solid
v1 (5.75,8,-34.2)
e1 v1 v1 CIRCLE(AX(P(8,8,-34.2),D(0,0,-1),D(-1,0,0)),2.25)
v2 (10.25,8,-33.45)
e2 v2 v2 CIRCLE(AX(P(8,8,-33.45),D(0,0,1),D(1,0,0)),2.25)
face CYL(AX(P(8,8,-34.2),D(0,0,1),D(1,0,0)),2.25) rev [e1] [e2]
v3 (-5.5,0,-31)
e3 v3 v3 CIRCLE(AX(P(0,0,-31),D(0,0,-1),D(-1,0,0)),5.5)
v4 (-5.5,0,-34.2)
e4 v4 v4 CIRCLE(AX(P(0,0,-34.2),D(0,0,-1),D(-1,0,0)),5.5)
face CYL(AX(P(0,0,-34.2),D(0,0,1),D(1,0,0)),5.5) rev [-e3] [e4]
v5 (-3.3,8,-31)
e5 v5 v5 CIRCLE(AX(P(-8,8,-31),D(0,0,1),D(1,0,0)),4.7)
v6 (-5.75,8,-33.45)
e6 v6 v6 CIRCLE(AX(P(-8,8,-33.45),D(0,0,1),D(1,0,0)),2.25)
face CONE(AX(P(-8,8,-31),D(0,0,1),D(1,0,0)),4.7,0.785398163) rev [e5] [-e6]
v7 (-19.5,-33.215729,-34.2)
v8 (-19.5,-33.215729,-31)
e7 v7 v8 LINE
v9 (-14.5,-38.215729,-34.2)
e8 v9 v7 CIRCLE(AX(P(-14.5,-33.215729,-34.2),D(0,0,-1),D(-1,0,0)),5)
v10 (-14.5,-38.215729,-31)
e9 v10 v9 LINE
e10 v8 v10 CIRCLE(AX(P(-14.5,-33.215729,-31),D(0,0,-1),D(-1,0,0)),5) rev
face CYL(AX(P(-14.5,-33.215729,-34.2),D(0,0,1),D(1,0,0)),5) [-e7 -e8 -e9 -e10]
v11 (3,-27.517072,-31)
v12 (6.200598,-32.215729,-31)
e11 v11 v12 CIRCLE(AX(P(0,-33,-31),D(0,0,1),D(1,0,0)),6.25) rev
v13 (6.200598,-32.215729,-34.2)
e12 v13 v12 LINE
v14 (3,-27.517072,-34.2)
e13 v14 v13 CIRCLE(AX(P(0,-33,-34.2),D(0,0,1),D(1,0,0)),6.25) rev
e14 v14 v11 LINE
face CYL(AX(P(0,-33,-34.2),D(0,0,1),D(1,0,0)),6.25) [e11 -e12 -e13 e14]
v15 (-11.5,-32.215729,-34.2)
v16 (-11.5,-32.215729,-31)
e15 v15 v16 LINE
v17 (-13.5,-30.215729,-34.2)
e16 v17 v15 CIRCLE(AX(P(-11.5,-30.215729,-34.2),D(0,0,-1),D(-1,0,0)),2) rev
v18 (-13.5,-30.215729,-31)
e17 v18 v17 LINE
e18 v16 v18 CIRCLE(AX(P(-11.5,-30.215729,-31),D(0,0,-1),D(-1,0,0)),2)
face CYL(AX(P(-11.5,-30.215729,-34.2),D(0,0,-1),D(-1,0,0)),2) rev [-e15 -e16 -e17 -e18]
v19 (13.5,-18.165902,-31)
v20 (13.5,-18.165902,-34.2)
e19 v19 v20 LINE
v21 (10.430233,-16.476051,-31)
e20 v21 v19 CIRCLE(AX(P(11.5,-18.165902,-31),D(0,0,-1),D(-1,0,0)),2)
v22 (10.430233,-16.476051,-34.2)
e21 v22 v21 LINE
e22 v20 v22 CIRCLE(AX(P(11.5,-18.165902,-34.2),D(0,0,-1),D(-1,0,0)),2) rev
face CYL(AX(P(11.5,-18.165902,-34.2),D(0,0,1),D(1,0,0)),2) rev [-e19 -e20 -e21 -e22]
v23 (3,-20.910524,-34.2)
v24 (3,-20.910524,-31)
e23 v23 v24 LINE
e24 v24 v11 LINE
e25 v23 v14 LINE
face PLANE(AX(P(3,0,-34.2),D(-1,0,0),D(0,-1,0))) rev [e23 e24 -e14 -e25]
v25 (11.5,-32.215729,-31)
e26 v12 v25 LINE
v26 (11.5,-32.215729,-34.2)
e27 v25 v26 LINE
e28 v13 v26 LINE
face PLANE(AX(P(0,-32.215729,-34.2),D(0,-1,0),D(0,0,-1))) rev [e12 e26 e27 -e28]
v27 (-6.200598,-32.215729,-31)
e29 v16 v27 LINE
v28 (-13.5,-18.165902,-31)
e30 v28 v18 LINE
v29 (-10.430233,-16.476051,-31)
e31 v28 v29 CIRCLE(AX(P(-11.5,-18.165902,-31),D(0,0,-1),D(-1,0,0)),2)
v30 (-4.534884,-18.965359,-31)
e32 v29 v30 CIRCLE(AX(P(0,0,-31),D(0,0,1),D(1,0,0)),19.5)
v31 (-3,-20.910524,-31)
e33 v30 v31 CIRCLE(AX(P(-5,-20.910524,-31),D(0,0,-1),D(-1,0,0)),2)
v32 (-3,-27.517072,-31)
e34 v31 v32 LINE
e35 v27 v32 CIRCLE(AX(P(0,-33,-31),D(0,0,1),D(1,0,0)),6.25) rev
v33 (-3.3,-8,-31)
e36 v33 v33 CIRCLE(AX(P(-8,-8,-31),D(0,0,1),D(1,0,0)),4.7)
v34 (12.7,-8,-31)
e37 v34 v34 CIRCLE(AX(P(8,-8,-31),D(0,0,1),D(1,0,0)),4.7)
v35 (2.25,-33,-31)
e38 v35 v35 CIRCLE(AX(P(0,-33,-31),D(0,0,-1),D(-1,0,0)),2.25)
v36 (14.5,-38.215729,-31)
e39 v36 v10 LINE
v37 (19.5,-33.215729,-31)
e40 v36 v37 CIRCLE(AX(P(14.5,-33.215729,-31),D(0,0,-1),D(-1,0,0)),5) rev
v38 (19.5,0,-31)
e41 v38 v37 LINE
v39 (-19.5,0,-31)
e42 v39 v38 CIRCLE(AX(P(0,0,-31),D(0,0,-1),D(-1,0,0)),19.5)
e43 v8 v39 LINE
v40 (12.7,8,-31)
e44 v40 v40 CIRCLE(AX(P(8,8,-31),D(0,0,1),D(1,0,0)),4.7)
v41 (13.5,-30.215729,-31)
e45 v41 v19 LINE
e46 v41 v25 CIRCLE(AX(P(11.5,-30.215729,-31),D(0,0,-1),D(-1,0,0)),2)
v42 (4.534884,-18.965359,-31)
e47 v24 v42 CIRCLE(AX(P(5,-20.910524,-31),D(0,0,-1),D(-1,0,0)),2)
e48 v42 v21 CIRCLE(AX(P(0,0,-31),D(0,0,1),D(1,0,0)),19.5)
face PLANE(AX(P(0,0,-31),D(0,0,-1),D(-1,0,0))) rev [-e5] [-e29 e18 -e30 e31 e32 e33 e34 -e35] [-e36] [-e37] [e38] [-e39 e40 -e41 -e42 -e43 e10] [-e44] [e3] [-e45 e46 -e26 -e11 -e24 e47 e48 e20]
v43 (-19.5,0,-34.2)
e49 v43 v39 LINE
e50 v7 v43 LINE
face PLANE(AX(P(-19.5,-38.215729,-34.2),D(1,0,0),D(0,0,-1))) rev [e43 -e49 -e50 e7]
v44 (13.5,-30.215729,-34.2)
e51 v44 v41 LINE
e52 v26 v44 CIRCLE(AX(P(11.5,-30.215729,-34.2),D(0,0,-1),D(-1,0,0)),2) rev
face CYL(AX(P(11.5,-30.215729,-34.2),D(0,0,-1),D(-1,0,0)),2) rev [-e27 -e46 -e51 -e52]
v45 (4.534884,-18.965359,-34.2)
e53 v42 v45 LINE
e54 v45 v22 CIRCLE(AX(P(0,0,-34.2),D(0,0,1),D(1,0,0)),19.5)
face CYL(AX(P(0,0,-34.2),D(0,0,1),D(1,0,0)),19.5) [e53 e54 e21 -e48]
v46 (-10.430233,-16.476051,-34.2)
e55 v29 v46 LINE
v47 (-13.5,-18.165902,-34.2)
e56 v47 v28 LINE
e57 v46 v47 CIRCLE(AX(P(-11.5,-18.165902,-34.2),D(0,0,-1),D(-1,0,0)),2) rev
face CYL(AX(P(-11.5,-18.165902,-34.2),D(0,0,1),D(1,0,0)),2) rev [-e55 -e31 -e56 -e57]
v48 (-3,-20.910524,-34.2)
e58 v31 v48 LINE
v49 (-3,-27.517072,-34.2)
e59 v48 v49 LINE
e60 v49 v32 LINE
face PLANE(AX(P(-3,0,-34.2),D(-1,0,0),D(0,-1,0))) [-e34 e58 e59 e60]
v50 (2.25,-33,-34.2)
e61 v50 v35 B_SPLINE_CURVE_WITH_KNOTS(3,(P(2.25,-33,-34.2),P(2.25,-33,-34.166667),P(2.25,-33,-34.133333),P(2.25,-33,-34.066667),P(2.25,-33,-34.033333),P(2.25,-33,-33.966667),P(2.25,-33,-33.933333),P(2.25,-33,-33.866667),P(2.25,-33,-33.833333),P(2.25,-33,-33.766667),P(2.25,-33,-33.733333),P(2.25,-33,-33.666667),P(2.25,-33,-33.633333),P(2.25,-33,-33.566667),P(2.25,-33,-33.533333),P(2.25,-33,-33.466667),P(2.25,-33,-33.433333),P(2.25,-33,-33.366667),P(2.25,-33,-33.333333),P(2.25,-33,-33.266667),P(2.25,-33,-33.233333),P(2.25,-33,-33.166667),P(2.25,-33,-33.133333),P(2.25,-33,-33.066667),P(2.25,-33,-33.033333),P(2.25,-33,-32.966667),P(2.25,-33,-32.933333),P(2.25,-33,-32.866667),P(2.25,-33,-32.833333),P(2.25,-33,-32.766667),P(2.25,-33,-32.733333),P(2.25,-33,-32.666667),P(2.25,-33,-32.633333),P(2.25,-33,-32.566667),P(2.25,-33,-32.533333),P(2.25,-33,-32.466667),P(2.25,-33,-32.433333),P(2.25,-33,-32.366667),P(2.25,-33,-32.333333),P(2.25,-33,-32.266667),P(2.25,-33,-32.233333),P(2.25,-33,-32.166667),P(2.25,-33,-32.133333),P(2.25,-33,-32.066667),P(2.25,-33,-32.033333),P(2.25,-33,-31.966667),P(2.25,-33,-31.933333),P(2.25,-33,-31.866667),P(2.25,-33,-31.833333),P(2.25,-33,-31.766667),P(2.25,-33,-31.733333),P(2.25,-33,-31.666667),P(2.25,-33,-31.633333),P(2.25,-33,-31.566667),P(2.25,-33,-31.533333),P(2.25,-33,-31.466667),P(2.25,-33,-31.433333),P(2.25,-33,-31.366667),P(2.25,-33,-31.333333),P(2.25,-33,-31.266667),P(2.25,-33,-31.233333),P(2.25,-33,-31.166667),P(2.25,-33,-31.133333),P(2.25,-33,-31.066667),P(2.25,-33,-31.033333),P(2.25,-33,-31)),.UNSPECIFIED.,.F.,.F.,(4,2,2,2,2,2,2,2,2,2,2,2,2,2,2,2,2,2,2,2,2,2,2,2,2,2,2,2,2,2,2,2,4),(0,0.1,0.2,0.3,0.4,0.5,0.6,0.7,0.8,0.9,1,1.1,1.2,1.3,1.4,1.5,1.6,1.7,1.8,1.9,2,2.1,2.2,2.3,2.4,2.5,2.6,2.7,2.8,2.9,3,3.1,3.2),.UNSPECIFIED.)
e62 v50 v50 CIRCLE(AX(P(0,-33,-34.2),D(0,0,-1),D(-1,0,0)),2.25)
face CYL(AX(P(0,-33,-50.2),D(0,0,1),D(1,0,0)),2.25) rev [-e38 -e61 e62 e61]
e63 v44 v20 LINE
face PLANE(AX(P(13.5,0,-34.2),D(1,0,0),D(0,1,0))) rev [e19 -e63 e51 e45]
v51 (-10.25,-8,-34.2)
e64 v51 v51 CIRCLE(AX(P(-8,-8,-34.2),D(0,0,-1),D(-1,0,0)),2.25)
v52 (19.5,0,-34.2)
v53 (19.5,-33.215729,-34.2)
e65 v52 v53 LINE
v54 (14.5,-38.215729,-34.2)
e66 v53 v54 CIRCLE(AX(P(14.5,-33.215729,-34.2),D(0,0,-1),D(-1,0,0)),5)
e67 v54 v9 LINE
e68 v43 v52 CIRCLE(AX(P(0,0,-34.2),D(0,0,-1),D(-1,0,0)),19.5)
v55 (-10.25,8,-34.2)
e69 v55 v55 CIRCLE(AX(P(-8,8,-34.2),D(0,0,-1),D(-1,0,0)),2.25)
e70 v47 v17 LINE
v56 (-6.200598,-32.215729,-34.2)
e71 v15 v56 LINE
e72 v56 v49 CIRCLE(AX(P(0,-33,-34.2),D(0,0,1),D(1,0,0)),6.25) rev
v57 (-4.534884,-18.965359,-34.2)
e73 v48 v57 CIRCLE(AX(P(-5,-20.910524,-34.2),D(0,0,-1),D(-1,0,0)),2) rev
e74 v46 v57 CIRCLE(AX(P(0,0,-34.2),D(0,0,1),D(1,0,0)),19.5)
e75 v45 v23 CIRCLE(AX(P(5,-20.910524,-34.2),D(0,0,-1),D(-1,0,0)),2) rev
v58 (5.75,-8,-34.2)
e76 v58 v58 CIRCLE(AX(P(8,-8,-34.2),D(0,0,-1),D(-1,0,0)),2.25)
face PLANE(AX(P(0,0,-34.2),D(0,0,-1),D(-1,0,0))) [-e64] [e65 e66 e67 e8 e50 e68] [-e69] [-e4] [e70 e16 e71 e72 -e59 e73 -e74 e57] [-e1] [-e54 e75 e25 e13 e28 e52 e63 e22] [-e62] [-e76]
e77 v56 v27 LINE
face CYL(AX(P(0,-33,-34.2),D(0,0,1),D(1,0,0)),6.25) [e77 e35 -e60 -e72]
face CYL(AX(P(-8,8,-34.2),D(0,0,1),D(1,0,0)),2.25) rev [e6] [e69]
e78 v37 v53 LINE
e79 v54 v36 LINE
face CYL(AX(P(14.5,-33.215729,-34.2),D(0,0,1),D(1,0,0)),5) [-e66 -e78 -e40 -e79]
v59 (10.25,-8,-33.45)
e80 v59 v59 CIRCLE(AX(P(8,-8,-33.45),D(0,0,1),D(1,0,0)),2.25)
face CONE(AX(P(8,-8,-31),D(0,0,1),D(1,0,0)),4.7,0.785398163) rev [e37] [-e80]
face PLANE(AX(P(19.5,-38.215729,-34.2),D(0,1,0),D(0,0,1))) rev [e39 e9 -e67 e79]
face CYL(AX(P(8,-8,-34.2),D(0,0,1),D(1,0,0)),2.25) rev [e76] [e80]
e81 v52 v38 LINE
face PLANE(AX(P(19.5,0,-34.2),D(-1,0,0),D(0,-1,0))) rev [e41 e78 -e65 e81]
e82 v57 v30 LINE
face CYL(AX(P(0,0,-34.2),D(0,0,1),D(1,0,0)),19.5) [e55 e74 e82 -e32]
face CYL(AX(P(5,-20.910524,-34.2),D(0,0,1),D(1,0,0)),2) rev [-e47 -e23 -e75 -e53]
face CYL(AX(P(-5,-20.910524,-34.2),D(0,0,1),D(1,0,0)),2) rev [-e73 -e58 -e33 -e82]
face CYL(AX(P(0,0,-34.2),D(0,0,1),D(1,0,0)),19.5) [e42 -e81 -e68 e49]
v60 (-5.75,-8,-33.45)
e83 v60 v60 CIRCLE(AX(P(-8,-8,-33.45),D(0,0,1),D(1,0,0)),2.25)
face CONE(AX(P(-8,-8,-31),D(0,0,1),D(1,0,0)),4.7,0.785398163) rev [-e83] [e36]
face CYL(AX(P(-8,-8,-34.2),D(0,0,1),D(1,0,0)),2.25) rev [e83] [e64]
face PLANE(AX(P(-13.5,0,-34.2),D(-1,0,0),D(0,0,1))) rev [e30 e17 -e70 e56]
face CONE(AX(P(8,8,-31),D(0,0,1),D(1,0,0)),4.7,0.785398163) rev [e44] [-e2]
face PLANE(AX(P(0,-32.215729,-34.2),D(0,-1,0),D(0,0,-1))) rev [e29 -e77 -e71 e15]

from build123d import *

# Parameters (mm, degrees)
STOCK_SPINE_MASTER_1_START                   = -34.2
STOCK_SPINE_MASTER_1_OUTLINE_R               = 2.25
STOCK_SPINE_MASTER_1_OUTLINE_R_2             = 5.5
STOCK_SPINE_MASTER_1_DEPTH                   = 3.2
FILLET1_R                                    = 5
CUT_EXTRUDE2_DEPTH                           = 44.022458369
FILLET2_R                                    = 2
CSK_FOR_M4_COUNTERSUNK_FLAT_HEAD_SCR_2_COUNT = 2
CSK_FOR_M4_COUNTERSUNK_FLAT_HEAD_SCR_2_PITCH = 16
CSK_FOR_M4_COUNTERSUNK_FLAT_HEAD_SCR_3_COUNT = 2
CSK_FOR_M4_COUNTERSUNK_FLAT_HEAD_SCR_3_PITCH = 22.627416998
CSK_FOR_M4_COUNTERSUNK_FLAT_HEAD_SCR_4_COUNT = 2
CSK_FOR_M4_COUNTERSUNK_FLAT_HEAD_SCR_4_PITCH = 16


# Read off the part's stored shape, not the designer's step: Stock-spine_master-1
with BuildPart() as part:
    # Stock-spine_master-1 outline → Stock-spine_master-1 (new body)
    with BuildSketch(Plane.XY.offset(STOCK_SPINE_MASTER_1_START)):
        with BuildLine():
            Line((19.5, -38.215728753), (19.5, 0))
            ThreePointArc((19.5, 0), (0, 19.5), (-19.5, 0))
            Line((-19.5, 0), (-19.5, -38.215728753))
            Line((-19.5, -38.215728753), (19.5, -38.215728753))
        make_face()
        with Locations((0, -33)):
            Circle(STOCK_SPINE_MASTER_1_OUTLINE_R, mode=Mode.SUBTRACT)
        with Locations((-8, -8)):
            Circle(STOCK_SPINE_MASTER_1_OUTLINE_R, mode=Mode.SUBTRACT)
        with Locations((-8, 8)):
            Circle(STOCK_SPINE_MASTER_1_OUTLINE_R, mode=Mode.SUBTRACT)
        with Locations((8, -8)):
            Circle(STOCK_SPINE_MASTER_1_OUTLINE_R, mode=Mode.SUBTRACT)
        Circle(STOCK_SPINE_MASTER_1_OUTLINE_R_2, mode=Mode.SUBTRACT)
        with Locations((8, 8)):
            Circle(STOCK_SPINE_MASTER_1_OUTLINE_R, mode=Mode.SUBTRACT)
    extrude(amount=STOCK_SPINE_MASTER_1_DEPTH)

    # Fillet1
    fillet1_edges = [part.edges().sort_by_distance(p)[0] for p in [
        (-19.5, -38.215728753, -32.6),
        (19.5, -38.215728753, -32.6),
    ]]
    fillet(fillet1_edges, radius=FILLET1_R)

    # Sketch1 → Cut-Extrude2 (cut, through all)
    with BuildSketch(Plane.XY.offset(-31)):
        with BuildLine():
            ThreePointArc((13.5, -14.071247279), (8.649489408, -17.476736909), (3, -19.267848868))
            Line((3, -19.267848868), (3, -27.51707195))
            ThreePointArc((3, -27.51707195), (5.165471514, -29.481420167), (6.200598246, -32.215728753))
            Line((6.200598246, -32.215728753), (6.25, -32.215728753))
            Line((6.25, -32.215728753), (13.5, -32.215728753))
            Line((13.5, -32.215728753), (13.5, -14.071247279))
        make_face()
        with BuildLine():
            Line((-3, -27.51707195), (-3, -19.267848868))
            ThreePointArc((-3, -19.267848868), (-8.649489408, -17.476736909), (-13.5, -14.071247279))
            Line((-13.5, -14.071247279), (-13.5, -32.215728753))
            Line((-13.5, -32.215728753), (-6.25, -32.215728753))
            Line((-6.25, -32.215728753), (-6.200598246, -32.215728753))
            ThreePointArc((-6.200598246, -32.215728753), (-5.165471514, -29.481420167), (-3, -27.51707195))
        make_face()
    extrude(amount=-CUT_EXTRUDE2_DEPTH, mode=Mode.SUBTRACT)

    # Fillet2
    fillet2_edges = [part.edges().sort_by_distance(p)[0] for p in [
        (3, -19.267848868, -32.6),
        (13.5, -14.071247279, -32.6),
        (13.5, -32.215728753, -32.6),
        (-13.5, -14.071247279, -32.6),
        (-3, -19.267848868, -32.6),
        (-13.5, -32.215728753, -32.6),
    ]]
    fillet(fillet2_edges, radius=FILLET2_R)

    # Sketch4 → CSK for M4 Countersunk Flat Head Screw1 (revolve, cut)
    with BuildSketch(Plane(origin=(-8, -8, -31), x_dir=(0, -1, 0), z_dir=(1, 0, 0))):
        Polygon((0, 0), (0, 3.2), (2.25, 3.2), (2.25, 2.45), (4.7, 0), align=None)
    csk_for_m4_countersunk_flat_head_screw1 = revolve(axis=Axis((-8, -8, -24.65), (0, 0, -1)), mode=Mode.SUBTRACT)

    # CSK for M4 Countersunk Flat Head Scr 2: CSK for M4 Countersunk Flat Head Screw1 ×2
    with Locations(*[(i * CSK_FOR_M4_COUNTERSUNK_FLAT_HEAD_SCR_2_PITCH, 0, 0) for i in range(1, CSK_FOR_M4_COUNTERSUNK_FLAT_HEAD_SCR_2_COUNT)]):
        add(csk_for_m4_countersunk_flat_head_screw1, mode=Mode.SUBTRACT)

    # CSK for M4 Countersunk Flat Head Scr 3: CSK for M4 Countersunk Flat Head Screw1 ×2
    with Locations(*[Vector(0.7071067811865426, 0.7071067811865526, 0) * (i * CSK_FOR_M4_COUNTERSUNK_FLAT_HEAD_SCR_3_PITCH) for i in range(1, CSK_FOR_M4_COUNTERSUNK_FLAT_HEAD_SCR_3_COUNT)]):
        add(csk_for_m4_countersunk_flat_head_screw1, mode=Mode.SUBTRACT)

    # CSK for M4 Countersunk Flat Head Scr 4: CSK for M4 Countersunk Flat Head Screw1 ×2
    with Locations(*[(0, i * CSK_FOR_M4_COUNTERSUNK_FLAT_HEAD_SCR_4_PITCH, 0) for i in range(1, CSK_FOR_M4_COUNTERSUNK_FLAT_HEAD_SCR_4_COUNT)]):
        add(csk_for_m4_countersunk_flat_head_screw1, mode=Mode.SUBTRACT)


solid = part.part
